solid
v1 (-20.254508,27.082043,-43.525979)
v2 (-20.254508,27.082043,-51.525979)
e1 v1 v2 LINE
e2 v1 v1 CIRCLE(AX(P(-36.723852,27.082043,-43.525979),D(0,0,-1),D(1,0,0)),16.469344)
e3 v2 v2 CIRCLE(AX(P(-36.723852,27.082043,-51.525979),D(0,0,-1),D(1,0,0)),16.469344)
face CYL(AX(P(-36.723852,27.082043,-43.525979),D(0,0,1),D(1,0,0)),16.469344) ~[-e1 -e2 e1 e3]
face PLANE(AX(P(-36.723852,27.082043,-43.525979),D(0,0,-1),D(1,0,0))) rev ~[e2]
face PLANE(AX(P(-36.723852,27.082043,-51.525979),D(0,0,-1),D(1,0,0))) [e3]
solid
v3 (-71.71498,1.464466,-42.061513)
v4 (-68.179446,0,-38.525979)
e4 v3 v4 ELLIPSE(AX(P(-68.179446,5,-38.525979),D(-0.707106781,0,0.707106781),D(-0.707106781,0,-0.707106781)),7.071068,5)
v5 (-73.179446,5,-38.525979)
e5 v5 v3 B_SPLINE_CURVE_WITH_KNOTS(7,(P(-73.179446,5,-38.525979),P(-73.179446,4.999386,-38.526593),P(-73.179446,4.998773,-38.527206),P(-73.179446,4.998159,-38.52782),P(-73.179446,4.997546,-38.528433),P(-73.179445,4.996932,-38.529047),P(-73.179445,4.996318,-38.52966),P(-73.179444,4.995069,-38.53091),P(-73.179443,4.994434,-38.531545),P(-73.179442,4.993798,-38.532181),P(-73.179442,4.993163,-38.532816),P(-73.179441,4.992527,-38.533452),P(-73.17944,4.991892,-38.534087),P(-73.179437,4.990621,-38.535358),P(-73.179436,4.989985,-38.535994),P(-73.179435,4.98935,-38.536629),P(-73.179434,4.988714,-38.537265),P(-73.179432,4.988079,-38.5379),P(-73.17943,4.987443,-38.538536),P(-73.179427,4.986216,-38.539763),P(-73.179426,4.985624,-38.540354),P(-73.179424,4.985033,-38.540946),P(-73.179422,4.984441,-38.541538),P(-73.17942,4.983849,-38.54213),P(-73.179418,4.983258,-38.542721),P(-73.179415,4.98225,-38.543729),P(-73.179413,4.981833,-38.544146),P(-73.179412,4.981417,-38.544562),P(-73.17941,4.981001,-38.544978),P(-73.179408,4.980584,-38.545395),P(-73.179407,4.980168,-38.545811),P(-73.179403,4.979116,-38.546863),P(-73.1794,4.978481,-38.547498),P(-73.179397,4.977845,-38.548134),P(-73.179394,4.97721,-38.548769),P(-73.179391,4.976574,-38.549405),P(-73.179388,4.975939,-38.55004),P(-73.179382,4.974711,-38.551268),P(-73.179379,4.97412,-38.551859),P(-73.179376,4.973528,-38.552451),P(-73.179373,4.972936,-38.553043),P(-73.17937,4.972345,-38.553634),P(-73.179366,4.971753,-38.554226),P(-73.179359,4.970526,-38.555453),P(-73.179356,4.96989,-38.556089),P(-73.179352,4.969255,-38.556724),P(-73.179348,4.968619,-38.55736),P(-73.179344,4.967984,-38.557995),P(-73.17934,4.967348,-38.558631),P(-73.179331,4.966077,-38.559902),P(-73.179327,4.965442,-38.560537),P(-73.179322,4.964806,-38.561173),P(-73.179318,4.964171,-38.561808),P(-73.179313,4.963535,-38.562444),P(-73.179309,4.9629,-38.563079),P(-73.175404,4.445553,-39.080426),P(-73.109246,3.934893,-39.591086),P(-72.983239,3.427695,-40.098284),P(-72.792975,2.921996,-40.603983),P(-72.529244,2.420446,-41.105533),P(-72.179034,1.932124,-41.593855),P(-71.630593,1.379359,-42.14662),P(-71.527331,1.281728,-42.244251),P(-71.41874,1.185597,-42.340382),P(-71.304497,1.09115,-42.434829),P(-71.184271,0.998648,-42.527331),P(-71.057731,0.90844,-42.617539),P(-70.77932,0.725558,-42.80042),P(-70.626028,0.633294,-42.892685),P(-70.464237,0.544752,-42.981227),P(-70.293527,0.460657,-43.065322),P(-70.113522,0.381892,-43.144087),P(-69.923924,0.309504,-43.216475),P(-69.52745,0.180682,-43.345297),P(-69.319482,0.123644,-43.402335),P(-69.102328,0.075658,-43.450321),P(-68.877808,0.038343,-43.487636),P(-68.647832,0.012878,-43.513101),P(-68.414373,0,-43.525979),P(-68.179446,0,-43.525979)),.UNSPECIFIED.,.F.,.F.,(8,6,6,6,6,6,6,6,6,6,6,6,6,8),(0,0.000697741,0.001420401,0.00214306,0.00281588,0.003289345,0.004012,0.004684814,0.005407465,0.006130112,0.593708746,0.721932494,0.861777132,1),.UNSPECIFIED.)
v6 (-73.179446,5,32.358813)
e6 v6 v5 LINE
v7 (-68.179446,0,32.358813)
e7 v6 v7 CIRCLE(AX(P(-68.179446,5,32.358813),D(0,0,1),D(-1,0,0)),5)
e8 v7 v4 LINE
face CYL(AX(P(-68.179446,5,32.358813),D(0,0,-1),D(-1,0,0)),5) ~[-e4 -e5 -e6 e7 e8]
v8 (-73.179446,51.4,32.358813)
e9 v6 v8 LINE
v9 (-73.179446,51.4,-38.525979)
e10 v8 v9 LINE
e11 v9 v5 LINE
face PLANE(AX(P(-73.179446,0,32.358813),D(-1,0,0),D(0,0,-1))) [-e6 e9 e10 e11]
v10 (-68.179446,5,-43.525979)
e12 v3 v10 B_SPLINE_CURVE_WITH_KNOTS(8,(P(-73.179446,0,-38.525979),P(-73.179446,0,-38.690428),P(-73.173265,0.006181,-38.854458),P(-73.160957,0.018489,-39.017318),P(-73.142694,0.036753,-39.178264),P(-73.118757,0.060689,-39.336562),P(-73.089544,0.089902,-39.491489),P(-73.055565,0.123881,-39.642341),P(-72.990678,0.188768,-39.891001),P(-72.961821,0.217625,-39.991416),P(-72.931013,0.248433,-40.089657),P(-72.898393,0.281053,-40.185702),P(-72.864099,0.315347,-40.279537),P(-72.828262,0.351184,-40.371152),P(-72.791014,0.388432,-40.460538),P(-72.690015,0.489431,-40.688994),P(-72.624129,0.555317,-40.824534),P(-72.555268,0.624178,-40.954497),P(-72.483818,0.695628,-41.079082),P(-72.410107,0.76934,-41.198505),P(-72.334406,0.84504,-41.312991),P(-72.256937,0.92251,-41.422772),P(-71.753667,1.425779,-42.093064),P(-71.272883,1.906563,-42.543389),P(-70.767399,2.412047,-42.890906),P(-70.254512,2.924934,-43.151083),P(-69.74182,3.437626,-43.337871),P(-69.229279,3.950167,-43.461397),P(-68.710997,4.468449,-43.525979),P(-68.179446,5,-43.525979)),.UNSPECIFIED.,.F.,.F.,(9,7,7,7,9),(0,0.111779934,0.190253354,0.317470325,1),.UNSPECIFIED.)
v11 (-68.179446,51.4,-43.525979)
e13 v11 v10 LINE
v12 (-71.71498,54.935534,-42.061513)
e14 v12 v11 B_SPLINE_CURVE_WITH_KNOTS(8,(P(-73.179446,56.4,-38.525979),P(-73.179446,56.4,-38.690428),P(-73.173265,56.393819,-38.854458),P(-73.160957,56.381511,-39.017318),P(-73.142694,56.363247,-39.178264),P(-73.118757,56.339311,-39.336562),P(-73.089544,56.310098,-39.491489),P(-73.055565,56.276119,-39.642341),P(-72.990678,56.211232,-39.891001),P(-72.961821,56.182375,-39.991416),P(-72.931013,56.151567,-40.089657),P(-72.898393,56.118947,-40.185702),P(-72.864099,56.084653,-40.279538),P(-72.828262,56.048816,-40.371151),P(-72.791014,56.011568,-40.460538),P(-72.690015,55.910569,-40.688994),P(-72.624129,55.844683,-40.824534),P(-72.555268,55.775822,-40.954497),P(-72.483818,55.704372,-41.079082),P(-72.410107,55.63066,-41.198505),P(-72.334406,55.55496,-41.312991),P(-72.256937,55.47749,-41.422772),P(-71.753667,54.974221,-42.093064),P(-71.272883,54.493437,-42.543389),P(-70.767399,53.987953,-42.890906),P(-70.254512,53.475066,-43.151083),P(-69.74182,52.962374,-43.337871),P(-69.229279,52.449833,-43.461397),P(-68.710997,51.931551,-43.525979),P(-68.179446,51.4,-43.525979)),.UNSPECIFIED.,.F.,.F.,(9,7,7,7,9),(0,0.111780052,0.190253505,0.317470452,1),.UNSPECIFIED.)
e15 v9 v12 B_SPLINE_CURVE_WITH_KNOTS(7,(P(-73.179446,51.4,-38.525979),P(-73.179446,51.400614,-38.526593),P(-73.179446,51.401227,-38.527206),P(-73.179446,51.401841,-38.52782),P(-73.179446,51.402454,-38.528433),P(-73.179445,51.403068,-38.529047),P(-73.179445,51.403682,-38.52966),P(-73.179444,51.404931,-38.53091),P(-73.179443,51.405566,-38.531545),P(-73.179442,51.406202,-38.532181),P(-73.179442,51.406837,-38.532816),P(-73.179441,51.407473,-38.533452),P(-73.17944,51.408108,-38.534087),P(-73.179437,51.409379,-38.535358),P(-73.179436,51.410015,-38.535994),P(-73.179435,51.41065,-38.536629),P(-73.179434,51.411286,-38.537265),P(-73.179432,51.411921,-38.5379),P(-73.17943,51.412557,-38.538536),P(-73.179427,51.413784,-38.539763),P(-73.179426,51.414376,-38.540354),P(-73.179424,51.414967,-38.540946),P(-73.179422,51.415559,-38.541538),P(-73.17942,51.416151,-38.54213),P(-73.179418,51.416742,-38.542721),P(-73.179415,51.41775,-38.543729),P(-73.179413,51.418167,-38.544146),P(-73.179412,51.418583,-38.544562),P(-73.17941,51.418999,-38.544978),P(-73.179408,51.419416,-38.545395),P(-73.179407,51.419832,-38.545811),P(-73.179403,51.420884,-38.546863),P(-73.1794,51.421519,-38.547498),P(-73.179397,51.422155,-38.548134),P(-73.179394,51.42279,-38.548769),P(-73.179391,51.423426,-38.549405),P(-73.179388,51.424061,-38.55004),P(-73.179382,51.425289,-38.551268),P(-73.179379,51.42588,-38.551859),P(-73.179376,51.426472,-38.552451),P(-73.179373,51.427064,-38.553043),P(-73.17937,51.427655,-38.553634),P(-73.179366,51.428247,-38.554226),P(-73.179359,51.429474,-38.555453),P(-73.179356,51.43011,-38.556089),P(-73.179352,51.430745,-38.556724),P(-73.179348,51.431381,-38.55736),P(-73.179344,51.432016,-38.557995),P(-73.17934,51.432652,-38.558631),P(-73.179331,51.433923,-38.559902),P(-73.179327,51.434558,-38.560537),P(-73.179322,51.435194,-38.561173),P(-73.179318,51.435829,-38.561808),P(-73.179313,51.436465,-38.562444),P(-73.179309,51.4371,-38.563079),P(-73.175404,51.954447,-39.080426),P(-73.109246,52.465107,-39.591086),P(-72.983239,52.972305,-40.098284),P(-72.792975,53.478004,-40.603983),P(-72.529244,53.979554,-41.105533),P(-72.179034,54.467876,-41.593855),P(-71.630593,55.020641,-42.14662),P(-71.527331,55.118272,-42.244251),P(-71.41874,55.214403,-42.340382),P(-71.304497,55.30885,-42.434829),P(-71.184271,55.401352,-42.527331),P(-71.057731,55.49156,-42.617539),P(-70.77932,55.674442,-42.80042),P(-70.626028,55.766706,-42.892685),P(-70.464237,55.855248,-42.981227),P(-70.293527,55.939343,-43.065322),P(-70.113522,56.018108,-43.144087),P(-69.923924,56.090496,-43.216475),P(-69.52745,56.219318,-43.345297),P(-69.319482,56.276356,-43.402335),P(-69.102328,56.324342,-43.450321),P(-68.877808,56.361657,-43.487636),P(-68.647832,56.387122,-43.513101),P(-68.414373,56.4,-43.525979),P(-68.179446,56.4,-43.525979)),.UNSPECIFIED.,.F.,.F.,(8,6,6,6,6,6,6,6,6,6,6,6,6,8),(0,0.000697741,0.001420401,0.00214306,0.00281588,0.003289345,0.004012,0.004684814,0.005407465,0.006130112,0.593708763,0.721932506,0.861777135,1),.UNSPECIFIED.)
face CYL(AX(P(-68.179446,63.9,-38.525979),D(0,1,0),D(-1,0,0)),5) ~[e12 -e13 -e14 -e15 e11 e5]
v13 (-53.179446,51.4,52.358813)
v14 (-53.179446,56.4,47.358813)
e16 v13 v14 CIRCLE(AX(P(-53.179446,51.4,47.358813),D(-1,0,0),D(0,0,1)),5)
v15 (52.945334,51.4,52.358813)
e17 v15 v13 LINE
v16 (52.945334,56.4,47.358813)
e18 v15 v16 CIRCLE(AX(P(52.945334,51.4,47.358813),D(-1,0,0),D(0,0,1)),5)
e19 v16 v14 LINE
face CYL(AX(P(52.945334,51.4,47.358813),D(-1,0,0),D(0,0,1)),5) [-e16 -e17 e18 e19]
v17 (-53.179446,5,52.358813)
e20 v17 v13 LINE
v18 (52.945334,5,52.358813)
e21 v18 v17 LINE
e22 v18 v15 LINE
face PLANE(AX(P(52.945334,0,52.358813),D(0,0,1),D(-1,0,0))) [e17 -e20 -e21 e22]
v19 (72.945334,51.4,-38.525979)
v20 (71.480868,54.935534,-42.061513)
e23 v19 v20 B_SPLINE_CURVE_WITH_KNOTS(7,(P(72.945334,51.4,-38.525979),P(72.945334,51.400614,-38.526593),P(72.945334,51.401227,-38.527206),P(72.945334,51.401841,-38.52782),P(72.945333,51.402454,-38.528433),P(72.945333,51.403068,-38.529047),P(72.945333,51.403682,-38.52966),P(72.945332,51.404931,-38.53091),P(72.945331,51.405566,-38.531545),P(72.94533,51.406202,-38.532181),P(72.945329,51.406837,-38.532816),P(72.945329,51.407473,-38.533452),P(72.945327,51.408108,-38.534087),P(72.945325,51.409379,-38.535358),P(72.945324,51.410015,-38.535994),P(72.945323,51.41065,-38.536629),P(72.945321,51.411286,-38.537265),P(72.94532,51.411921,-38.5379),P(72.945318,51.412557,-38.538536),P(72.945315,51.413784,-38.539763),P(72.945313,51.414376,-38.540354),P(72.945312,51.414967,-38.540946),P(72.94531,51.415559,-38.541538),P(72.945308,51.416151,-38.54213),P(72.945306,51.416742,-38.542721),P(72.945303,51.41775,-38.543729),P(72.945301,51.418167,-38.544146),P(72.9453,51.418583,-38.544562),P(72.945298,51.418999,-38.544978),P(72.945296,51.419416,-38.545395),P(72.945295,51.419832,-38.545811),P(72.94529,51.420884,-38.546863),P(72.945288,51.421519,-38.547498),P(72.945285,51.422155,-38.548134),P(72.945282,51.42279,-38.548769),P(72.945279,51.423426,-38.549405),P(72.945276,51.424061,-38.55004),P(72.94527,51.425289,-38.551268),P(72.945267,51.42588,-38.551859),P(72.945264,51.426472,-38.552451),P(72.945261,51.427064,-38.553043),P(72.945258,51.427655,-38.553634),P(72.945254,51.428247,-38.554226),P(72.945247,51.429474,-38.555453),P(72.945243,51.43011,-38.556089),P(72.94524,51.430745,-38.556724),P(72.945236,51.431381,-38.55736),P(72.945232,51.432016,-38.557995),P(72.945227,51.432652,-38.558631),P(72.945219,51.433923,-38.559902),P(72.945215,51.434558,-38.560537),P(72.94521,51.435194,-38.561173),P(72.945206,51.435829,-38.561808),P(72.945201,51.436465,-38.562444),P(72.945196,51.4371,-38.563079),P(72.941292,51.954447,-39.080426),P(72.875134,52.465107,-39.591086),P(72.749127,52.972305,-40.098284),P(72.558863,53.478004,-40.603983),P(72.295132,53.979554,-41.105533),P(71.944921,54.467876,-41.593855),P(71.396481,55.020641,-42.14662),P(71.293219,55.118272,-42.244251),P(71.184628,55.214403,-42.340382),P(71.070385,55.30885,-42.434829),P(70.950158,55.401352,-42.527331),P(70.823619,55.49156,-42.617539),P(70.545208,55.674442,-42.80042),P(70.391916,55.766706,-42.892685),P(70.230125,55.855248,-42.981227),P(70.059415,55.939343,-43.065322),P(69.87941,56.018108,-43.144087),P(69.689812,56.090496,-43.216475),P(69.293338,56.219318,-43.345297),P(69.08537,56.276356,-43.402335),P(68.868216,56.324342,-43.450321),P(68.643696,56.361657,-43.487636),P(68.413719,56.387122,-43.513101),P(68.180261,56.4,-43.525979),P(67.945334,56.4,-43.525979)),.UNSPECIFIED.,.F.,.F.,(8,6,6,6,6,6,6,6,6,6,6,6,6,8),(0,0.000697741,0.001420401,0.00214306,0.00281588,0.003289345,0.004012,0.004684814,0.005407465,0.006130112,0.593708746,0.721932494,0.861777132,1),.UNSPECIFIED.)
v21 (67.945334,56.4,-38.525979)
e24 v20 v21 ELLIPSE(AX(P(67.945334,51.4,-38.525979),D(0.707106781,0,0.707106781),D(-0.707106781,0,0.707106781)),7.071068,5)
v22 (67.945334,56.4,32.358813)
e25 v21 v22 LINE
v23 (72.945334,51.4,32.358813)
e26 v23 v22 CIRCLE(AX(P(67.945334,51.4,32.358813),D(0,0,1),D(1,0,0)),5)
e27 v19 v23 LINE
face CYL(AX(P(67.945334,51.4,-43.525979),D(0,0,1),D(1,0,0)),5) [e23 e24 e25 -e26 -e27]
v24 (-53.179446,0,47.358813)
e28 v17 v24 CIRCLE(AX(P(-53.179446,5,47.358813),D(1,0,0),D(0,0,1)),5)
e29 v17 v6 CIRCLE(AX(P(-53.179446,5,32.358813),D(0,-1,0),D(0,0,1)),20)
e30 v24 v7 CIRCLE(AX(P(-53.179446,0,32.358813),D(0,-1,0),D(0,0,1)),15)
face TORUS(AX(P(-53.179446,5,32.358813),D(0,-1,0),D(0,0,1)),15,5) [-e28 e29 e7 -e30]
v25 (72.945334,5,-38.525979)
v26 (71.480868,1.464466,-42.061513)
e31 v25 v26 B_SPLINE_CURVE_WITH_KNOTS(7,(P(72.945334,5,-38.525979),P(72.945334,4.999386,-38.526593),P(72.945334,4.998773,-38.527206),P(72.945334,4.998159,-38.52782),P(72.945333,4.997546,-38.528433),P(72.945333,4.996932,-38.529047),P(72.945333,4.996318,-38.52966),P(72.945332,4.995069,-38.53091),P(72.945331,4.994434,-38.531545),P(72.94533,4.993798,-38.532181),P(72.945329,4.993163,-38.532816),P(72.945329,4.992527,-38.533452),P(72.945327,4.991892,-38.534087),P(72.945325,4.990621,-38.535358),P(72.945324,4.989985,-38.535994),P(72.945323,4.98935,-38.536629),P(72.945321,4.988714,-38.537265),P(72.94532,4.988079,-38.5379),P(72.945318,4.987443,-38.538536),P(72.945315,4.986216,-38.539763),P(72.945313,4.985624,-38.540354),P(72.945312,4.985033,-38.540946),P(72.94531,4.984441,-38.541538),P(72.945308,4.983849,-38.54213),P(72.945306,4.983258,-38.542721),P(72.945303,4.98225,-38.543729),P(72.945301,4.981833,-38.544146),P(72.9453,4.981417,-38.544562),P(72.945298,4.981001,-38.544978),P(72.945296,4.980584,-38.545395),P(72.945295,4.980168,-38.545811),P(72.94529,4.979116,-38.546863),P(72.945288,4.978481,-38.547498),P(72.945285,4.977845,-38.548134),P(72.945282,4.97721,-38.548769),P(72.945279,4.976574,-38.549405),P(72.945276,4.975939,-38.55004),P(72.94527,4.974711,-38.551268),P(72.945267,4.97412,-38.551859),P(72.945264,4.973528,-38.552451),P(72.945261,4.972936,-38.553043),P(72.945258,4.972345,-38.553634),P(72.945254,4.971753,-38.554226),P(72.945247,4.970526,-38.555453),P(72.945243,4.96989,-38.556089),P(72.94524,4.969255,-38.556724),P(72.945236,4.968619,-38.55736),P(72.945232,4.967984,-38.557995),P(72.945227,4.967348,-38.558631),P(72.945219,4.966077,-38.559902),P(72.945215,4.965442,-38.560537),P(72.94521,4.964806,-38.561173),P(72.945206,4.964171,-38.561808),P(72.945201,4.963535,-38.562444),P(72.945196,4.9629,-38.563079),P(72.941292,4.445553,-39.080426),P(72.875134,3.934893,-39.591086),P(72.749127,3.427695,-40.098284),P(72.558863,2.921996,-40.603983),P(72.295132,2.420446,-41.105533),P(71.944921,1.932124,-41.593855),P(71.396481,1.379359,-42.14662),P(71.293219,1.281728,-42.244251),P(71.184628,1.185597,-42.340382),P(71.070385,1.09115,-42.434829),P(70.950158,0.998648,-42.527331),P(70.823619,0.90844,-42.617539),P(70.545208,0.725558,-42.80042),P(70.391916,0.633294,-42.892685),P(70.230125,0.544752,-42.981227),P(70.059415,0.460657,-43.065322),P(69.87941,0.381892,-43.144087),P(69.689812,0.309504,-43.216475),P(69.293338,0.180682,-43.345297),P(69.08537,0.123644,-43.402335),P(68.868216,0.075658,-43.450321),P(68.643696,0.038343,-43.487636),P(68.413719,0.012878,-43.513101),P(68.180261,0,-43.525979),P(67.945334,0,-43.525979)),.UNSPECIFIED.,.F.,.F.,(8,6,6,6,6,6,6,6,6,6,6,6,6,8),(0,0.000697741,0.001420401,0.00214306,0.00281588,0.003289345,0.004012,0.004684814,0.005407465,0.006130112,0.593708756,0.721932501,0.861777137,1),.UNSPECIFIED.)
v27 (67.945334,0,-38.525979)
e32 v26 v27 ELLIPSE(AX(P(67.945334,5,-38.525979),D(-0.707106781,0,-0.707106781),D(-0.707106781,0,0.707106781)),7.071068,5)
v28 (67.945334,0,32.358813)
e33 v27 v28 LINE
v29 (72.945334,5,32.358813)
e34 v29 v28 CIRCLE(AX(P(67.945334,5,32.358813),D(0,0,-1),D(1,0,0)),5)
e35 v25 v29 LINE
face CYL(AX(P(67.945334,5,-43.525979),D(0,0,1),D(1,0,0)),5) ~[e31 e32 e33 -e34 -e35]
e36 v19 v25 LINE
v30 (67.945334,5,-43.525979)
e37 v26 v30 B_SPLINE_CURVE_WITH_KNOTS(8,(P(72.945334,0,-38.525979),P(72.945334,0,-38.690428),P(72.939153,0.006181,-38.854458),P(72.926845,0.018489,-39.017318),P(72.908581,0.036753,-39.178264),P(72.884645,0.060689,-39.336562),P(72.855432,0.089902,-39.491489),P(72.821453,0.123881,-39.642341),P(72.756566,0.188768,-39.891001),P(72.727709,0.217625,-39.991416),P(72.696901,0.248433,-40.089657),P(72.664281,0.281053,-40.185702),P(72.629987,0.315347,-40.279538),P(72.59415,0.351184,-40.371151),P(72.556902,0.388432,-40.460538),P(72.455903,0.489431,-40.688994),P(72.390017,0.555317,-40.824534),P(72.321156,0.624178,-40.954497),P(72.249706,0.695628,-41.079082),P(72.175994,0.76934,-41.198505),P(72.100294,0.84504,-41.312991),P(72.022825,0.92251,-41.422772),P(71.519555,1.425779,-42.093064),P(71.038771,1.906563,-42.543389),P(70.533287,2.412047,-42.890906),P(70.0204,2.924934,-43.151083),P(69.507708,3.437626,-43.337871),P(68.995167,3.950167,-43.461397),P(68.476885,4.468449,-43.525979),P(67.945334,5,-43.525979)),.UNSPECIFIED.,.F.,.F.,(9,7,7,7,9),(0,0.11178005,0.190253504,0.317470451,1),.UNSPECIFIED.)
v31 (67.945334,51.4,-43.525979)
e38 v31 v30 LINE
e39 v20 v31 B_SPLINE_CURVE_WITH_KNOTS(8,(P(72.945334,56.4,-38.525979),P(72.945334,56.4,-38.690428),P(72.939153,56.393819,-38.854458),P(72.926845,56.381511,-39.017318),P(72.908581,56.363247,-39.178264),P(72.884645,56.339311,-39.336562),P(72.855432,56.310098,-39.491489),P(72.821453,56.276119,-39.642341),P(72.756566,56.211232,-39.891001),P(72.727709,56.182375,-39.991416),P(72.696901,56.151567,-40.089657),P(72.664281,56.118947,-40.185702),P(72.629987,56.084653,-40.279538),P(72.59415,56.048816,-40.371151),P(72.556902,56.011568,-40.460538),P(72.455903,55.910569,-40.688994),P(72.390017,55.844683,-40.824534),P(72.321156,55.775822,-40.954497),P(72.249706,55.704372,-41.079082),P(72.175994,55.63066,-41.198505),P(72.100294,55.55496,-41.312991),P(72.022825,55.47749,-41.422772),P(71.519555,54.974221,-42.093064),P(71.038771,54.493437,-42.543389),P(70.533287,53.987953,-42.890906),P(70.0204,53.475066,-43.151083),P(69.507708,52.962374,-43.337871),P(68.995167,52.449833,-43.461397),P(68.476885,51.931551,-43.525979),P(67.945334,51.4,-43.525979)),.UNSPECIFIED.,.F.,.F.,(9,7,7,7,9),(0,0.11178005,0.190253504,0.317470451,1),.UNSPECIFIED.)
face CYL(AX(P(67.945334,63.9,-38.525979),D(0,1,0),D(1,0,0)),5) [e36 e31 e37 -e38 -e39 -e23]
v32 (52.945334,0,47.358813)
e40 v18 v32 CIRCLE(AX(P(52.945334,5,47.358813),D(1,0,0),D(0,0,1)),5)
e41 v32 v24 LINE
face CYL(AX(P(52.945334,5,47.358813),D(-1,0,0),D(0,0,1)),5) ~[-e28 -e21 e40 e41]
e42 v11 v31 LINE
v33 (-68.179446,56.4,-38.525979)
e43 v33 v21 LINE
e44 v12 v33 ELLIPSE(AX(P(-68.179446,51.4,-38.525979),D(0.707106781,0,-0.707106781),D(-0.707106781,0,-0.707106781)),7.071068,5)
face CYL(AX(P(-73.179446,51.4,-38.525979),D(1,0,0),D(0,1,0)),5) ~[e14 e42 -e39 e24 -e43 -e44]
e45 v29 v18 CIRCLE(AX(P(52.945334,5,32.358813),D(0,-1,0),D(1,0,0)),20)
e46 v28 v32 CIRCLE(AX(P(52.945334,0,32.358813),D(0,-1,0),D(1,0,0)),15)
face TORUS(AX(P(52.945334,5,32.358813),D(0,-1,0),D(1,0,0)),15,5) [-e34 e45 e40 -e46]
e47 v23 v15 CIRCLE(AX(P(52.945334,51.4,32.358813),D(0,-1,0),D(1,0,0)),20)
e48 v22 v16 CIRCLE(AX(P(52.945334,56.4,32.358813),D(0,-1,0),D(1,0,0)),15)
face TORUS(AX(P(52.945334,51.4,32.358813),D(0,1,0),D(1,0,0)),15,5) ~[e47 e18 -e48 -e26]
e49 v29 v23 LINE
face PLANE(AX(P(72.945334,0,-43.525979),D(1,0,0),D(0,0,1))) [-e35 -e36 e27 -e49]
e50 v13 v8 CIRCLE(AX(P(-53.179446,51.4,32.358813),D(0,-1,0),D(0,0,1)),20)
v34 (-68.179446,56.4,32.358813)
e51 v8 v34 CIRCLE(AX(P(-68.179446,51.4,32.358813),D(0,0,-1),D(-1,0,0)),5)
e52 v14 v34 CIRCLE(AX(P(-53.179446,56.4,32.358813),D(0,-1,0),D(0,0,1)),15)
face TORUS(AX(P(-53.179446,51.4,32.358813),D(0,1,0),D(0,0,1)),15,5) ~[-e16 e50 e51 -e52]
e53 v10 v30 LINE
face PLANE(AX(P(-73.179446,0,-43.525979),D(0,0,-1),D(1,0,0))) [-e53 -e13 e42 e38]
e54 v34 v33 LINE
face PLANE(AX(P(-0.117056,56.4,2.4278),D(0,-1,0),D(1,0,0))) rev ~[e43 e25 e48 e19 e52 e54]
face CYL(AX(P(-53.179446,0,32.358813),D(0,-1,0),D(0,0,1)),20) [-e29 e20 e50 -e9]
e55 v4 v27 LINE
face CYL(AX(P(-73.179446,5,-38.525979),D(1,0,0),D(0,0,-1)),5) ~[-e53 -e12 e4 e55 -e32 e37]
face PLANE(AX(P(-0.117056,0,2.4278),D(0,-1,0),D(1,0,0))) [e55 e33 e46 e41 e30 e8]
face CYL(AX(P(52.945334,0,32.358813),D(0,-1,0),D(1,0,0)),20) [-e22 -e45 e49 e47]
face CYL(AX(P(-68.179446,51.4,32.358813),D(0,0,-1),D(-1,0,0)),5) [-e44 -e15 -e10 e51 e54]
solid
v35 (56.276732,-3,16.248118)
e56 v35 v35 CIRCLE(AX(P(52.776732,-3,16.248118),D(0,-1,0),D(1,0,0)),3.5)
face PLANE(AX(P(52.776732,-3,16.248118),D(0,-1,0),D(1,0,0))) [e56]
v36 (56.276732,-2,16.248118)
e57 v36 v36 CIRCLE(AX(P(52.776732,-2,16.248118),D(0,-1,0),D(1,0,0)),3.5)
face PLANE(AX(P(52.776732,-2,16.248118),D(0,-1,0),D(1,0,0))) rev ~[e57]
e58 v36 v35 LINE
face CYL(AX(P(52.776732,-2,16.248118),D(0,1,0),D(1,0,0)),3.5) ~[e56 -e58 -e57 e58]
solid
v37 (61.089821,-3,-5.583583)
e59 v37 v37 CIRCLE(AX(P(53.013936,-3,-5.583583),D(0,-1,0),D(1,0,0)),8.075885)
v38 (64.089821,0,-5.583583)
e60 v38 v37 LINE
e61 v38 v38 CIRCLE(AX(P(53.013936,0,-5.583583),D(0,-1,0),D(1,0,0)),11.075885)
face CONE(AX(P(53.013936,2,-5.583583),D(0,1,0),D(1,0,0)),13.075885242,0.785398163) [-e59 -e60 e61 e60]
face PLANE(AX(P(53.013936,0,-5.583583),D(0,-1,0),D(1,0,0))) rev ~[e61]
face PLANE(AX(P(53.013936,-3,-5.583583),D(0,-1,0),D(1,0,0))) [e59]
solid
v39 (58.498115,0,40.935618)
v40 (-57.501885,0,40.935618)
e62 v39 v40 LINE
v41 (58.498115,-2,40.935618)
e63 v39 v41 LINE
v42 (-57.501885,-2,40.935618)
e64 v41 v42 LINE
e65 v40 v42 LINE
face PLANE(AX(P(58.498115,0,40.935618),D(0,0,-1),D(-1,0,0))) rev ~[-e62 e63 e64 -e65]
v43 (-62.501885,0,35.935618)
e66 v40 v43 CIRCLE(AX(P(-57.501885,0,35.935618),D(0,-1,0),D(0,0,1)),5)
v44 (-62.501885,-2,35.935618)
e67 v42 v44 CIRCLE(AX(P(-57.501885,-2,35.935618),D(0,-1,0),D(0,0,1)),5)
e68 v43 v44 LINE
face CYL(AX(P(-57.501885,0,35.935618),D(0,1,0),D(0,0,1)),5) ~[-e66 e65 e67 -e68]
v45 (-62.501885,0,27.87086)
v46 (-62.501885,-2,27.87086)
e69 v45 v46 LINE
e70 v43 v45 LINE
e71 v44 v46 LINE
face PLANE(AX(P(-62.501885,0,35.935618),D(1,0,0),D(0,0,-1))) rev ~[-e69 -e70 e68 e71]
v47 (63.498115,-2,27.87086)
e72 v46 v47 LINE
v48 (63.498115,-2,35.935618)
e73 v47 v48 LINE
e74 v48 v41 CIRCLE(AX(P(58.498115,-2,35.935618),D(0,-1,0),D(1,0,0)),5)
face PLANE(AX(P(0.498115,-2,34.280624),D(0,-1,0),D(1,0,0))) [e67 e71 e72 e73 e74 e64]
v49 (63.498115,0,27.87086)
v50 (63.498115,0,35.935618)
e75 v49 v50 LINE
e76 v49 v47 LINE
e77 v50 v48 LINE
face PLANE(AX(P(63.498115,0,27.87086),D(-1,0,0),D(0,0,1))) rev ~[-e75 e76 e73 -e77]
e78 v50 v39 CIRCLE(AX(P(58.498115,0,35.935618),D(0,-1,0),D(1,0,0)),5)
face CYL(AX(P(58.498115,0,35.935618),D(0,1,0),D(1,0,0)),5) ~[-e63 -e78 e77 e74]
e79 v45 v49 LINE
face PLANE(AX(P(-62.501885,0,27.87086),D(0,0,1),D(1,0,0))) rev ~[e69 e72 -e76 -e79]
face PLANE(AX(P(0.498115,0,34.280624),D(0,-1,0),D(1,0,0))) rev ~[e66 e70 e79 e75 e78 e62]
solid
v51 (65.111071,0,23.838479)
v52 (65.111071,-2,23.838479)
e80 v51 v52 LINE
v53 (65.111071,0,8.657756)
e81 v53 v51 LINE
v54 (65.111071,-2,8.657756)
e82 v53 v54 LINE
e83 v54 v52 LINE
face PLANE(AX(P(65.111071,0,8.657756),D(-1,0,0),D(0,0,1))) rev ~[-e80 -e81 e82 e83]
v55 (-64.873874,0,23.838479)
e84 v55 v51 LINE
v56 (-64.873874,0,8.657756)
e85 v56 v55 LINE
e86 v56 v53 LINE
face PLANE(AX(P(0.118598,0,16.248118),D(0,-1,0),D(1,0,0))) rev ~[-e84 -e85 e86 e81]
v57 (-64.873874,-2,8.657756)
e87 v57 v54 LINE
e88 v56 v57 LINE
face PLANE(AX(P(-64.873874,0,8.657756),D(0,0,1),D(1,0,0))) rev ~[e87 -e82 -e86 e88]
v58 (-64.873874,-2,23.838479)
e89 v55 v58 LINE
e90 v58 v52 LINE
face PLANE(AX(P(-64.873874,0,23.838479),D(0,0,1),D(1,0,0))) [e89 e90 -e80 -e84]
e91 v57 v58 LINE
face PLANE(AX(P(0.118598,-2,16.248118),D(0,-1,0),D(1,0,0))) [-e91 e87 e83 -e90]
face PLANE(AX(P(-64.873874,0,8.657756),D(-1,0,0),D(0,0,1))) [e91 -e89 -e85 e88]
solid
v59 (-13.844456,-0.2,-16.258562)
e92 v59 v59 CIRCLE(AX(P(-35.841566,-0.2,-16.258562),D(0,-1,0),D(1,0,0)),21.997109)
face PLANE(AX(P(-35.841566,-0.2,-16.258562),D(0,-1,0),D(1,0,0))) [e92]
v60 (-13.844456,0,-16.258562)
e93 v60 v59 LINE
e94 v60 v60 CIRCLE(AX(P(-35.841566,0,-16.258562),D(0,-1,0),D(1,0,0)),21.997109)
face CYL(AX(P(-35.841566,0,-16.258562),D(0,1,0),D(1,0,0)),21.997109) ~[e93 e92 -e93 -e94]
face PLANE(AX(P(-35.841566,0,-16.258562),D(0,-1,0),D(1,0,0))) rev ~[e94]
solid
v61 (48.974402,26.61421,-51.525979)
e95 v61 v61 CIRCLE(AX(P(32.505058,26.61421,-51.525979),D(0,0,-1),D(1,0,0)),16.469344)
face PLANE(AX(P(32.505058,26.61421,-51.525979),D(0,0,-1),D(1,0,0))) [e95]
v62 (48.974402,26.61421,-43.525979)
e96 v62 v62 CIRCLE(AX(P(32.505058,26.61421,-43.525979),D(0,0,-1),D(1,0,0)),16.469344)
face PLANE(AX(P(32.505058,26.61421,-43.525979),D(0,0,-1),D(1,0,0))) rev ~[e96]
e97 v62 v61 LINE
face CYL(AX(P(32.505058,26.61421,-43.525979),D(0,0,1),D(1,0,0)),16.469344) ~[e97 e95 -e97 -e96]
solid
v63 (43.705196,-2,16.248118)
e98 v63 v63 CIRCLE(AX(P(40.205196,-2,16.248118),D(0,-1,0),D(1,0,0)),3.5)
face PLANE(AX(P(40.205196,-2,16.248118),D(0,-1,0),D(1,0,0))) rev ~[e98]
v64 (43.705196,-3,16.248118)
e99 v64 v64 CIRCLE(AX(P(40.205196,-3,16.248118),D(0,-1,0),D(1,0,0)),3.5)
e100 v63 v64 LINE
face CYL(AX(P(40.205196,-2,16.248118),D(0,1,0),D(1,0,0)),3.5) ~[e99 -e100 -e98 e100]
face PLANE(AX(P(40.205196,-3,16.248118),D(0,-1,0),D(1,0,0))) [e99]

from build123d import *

# Parameters (mm, degrees)
F1_DEPTH     = 56.4
F4_W         = 129.9849450588
F4_H         = 15.1807228103
F5_DEPTH     = 2
F6_R         = 3.5
F7_DEPTH     = 1
F2_R         = 16.4693442444
F8_DEPTH     = 8
F3_R         = 13.0758852418
F9_DEPTH     = 3
F11_DEPTH    = 2
F34_R        = 5
F35_R        = 5
F36_T1_DEPTH = 71.4
F37_T1_DEPTH = 71.4
F40_R        = 21.9971090936
F41_DEPTH    = 0.2


# Not quite as in the source:
# - a fillet or chamfer that OpenCascade refuses, or shapes differently, is made with other operations: its cross-section is extruded or revolved along the edge and cut away or added
# - the program builds the solid bodies; features that only make, move or delete a surface that nothing else refers to are left out


with BuildPart() as f1:
    # F0 (on Front) → F1 (new body)
    with BuildSketch(Plane.XZ):
        with BuildLine():
            Line((52.9453340173, 52.3588129878), (-53.1794461608, 52.3588129878))
            ThreePointArc((-53.1794461608, 52.3588129878), (-67.3215817845, 46.5009486115), (-73.1794461608, 32.3588129878))
            Line((-73.1794461608, 32.3588129878), (-73.1794461608, -43.5259789228))
            Line((-73.1794461608, -43.5259789228), (72.9453340173, -43.5259789228))
            Line((72.9453340173, -43.5259789228), (72.9453340173, 32.3588129878))
            ThreePointArc((72.9453340173, 32.3588129878), (67.087469641, 46.5009486115), (52.9453340173, 52.3588129878))
        make_face()
    extrude(amount=-F1_DEPTH)

    # F34
    f34_edges = [f1.edges().sort_by_distance(p)[0] for p in [
        (-0.117056, 0, 52.358813),
        (-67.321582, 0, 46.500949),
        (-73.179446, 0, -5.583583),
        (-0.117056, 0, -43.525979),
        (72.945334, 0, -5.583583),
        (67.08747, 0, 46.500949),
    ]]
    fillet(f34_edges, radius=F34_R)

    # F35
    f35_edges = [f1.edges().sort_by_distance(p)[0] for p in [
        (-0.117056, 56.4, 52.358813),
        (-67.321582, 56.4, 46.500949),
        (-73.179446, 56.4, -5.583583),
        (-0.117056, 56.4, -43.525979),
        (72.945334, 56.4, -5.583583),
        (67.08747, 56.4, 46.500949),
    ]]
    fillet(f35_edges, radius=F35_R)

    # F36: fillet of radius 5 on 4 edges, made by hand

    # F36_s2 → F36_t1 (cut)
    with BuildSketch(Plane.XZ.offset(-63.9)):
        with BuildLine():
            ThreePointArc((72.9453340173, -38.5259789228), (71.4808679232, -42.0615128288), (67.9453340173, -43.5259789228))
            Line((67.9453340173, -43.5259789228), (72.9453340173, -43.5259789228))
            Line((72.9453340173, -43.5259789228), (72.9453340173, -38.5259789228))
        make_face()
    extrude(amount=F36_T1_DEPTH, mode=Mode.SUBTRACT)

    # F37: fillet of radius 5 on 4 edges, made by hand

    # F37_s2 → F37_t1 (cut)
    with BuildSketch(Plane.XZ.offset(-63.9)):
        with BuildLine():
            ThreePointArc((-73.1794461608, -38.5259789228), (-71.7149800667, -42.0615128288), (-68.1794461608, -43.5259789228))
            Line((-68.1794461608, -43.5259789228), (-73.1794461608, -43.5259789228))
            Line((-73.1794461608, -43.5259789228), (-73.1794461608, -38.5259789228))
        make_face()
    extrude(amount=F37_T1_DEPTH, mode=Mode.SUBTRACT)


with BuildPart() as f5:
    # F4 (on face) → F5 (new body)
    with BuildSketch(Plane.XZ):
        with Locations((0.1185983419, 16.2481176667)):
            Rectangle(F4_W, F4_H)
    extrude(amount=F5_DEPTH)


with BuildPart() as f7:
    # F6 (on face) → F7 (new body)
    with BuildSketch(Plane.XZ.offset(2)):
        with Locations((52.7767315507, 16.2481181324)):
            Circle(F6_R)
    extrude(amount=F7_DEPTH)


with BuildPart() as f7b:
    # F6 (on face) → F7, piece 2 (new body)
    with BuildSketch(Plane.XZ.offset(2)):
        with Locations((40.2051955462, 16.2481181324)):
            Circle(F6_R)
    extrude(amount=F7_DEPTH)


with BuildPart() as f8:
    # F2 (on face) → F8 (new body)
    with BuildSketch(Plane(origin=(0, 0, -43.5259789228), x_dir=(1, 0, 0), z_dir=(0, 0, -1))):
        with Locations((-36.7238521576, -27.0820427686)):
            Circle(F2_R)
    extrude(amount=F8_DEPTH)


with BuildPart() as f8b:
    # F2 (on face) → F8, piece 2 (new body)
    with BuildSketch(Plane(origin=(0, 0, -43.5259789228), x_dir=(1, 0, 0), z_dir=(0, 0, -1))):
        with Locations((32.5050577521, -26.614209637)):
            Circle(F2_R)
    extrude(amount=F8_DEPTH)


with BuildPart() as f9:
    # F3 (on face) → F9 (new body)
    with BuildSketch(Plane.XZ):
        with Locations((53.0139356852, -5.5835829675)):
            Circle(F3_R)
    extrude(amount=F9_DEPTH)

    # F29: chamfer of 5 on 1 edges, made by hand

    # F29_s1 → F29_t2 (revolve, cut)
    with BuildSketch(Plane.XY.offset(-5.5835829675)):
        Polygon((66.089820927, 2), (61.089820927, -3), (66.089820927, -3), align=None)
    revolve(axis=Axis((53.0139356852, -3, -5.5835829675), (0, -1, 0)), mode=Mode.SUBTRACT)


with BuildPart() as f11:
    # F10 (on face) → F11 (new body)
    with BuildSketch(Plane.XZ):
        with BuildLine():
            Line((58.4981150031, 40.9356179833), (-57.5018849969, 40.9356179833))
            ThreePointArc((-57.5018849969, 40.9356179833), (-61.0374189028, 39.4711518893), (-62.5018849969, 35.9356179833))
            Line((-62.5018849969, 35.9356179833), (-62.5018849969, 27.8708599508))
            Line((-62.5018849969, 27.8708599508), (63.4981150031, 27.8708599508))
            Line((63.4981150031, 27.8708599508), (63.4981150031, 35.9356179833))
            ThreePointArc((63.4981150031, 35.9356179833), (62.033648909, 39.4711518893), (58.4981150031, 40.9356179833))
        make_face()
    extrude(amount=F11_DEPTH)


with BuildPart() as f41:
    # F40 (on face) → F41 (new body)
    with BuildSketch(Plane.XZ):
        with Locations((-35.8415655792, -16.2585619837)):
            Circle(F40_R)
    extrude(amount=F41_DEPTH)


solid = Compound([f1.part, f5.part, f7.part, f7b.part, f8.part, f8b.part, f9.part, f11.part, f41.part])
